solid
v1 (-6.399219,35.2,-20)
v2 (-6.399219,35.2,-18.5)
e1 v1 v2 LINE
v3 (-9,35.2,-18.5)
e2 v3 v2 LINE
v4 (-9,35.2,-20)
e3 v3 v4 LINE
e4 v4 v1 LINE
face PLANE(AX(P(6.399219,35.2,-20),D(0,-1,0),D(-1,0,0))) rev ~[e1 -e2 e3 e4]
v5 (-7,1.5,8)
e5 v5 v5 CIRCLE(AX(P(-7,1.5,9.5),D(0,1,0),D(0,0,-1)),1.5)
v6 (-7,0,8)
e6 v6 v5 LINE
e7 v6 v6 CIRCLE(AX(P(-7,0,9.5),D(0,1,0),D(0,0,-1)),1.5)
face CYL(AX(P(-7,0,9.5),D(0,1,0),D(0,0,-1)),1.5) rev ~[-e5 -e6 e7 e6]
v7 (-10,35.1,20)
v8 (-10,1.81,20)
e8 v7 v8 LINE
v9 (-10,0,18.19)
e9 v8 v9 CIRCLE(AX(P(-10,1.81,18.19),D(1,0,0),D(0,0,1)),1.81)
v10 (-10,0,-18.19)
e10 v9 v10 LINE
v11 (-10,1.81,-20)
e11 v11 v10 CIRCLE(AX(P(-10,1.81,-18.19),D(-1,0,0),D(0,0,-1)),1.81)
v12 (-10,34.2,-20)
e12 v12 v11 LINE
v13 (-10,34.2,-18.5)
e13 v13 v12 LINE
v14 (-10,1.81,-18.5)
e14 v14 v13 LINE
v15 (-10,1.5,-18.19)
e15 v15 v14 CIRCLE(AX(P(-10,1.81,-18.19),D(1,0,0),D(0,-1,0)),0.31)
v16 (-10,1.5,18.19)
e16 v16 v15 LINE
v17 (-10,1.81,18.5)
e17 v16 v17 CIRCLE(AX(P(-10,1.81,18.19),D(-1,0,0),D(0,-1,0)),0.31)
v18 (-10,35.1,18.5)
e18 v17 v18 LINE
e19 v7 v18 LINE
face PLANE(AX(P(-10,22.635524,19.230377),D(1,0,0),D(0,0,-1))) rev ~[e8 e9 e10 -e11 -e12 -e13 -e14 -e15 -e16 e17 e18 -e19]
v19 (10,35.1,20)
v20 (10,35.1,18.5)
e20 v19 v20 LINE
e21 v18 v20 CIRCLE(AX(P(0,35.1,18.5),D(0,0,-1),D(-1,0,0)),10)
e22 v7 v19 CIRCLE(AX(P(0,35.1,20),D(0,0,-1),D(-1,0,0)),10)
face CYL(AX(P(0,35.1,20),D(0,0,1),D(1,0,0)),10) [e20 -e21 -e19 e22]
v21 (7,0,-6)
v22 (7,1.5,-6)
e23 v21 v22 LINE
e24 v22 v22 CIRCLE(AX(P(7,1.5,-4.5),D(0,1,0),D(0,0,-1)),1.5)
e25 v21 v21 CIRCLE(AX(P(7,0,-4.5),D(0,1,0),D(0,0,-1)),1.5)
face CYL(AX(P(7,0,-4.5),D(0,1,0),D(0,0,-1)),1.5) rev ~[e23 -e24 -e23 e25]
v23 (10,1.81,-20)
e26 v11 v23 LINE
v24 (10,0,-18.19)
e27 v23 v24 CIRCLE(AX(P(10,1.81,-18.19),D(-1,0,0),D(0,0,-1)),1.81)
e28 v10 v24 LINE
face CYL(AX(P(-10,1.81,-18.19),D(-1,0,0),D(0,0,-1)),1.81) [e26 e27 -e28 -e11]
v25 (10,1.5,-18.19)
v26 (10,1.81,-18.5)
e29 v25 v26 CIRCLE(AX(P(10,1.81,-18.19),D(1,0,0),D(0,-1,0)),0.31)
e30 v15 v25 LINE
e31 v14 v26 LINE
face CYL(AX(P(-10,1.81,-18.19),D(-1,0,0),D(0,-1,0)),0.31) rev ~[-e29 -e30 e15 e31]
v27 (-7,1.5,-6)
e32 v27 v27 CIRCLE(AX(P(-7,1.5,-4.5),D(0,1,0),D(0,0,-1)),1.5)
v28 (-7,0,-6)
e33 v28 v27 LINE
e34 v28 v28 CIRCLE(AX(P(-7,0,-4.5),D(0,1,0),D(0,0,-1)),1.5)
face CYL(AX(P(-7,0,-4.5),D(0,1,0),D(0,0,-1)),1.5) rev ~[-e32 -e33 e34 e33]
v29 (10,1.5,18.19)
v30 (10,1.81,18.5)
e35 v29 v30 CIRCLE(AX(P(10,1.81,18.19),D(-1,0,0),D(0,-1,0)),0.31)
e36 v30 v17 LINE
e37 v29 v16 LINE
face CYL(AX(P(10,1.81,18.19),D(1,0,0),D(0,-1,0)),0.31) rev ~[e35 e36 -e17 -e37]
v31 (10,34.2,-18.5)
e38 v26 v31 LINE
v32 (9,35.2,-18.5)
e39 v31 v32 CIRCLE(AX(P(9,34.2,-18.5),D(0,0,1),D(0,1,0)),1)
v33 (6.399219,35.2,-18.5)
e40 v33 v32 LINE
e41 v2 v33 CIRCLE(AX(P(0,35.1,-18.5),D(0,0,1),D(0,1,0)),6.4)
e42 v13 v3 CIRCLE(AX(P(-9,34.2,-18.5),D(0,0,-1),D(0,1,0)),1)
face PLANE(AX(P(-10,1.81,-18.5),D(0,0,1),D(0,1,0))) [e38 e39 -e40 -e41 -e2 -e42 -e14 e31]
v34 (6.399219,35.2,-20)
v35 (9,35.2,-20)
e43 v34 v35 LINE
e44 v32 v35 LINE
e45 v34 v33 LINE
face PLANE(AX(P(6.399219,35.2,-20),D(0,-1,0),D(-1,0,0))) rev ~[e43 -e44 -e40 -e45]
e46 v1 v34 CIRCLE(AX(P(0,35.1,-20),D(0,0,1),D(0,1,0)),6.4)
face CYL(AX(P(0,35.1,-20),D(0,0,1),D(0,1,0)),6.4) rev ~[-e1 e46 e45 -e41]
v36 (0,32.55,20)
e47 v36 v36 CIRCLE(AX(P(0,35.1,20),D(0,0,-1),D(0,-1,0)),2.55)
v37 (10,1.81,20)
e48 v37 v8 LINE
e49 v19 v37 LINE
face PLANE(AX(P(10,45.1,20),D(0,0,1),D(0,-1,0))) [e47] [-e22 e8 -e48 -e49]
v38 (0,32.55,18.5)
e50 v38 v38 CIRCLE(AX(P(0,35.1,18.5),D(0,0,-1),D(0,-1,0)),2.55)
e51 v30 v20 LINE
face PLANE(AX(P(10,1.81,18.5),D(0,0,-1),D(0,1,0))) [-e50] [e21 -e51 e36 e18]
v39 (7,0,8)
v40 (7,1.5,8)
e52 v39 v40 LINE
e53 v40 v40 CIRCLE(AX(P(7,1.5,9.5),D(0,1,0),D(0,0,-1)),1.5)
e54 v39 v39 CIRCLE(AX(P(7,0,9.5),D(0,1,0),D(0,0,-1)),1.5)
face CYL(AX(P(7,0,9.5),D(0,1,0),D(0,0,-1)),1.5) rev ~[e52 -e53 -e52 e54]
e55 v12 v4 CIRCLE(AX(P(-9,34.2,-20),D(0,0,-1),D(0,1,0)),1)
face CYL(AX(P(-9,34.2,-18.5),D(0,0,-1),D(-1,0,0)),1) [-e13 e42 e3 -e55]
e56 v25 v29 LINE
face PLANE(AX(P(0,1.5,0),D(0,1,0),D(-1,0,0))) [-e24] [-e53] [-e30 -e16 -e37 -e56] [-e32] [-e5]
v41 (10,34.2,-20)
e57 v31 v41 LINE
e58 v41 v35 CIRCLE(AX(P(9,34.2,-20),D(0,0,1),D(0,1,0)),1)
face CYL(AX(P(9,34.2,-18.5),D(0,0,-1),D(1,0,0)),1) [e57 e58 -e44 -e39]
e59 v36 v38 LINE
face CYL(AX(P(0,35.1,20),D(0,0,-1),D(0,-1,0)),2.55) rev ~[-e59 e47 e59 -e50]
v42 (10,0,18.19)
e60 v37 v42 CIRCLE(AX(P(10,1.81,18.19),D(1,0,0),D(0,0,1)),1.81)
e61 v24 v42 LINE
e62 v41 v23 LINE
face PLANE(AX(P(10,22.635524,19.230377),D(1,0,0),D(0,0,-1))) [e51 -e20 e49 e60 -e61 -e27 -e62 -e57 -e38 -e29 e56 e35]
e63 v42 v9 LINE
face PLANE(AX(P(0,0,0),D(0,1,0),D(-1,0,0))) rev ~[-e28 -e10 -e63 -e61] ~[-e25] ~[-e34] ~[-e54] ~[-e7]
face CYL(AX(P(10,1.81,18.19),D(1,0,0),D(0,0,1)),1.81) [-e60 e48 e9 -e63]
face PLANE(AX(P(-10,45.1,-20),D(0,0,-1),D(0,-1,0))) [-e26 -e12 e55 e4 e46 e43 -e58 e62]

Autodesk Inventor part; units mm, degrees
ref_plane "YZ Plane" through (0, 0, 0) normal (1, 0, 0) x (0, 1, 0)
ref_plane "XZ Plane" through (0, 0, 0) normal (0, 1, 0) x (-1, 0, 0)
ref_plane "XY Plane" through (0, 0, 0) normal (0, 0, 1) x (1, 0, 0)
sketch "Sketch1" plane through (0, 0, 0) normal (0, 1, 0) x (-1, 0, 0)
  line L0 (10, -18.5) -> (-10, -18.5)
  line L1 (-10, -18.5) -> (-10, 18.5)
  line L2 (-10, 18.5) -> (10, 18.5)
  line L3 (10, 18.5) -> (10, -18.5)
  point P0 (0, 0)
  dimension "d0" = 20
  dimension "d1" = 37
  dimension "d2" = 18.5
  dimension "d3" = 10
extrude "Plate1" add sketch "Sketch1" along normal blind 1.5
sketch "Sketch2" plane through (-10, 0, -20) normal (0, 0, 1) x (1, 0, 0)
  line L0 (20, 0) -> (0, 0)
  line L1 (0, 0) -> (0, 45.1)
  line L2 (0, 45.1) -> (20, 45.1)
  line L3 (20, 45.1) -> (20, 0)
edge flange "Flange1" height 45.1 angle 90 thickness 1.5 bend radius 0.31 thickness toward (0, 0, 1) relief tear relief width 1.5 relief depth 0.75 edges at (0, 1.5, -18.5) wall of the first edge with corners at (10, 0, -20) (-10, 0, -20) (-10, 45.1, -20) (10, 45.1, -20)
bend "Bend1"
corner "Corner1"
sketch "Sketch3" plane through (10, 0, 20) normal (0, 0, -1) x (-1, 0, 0)
  line L0 (20, 0) -> (0, 0)
  line L1 (0, 0) -> (0, 45.1)
  line L2 (0, 45.1) -> (20, 45.1)
  line L3 (20, 45.1) -> (20, 0)
edge flange "Flange2" height 45.1 angle 90 thickness 1.5 bend radius 0.31 thickness toward (0, 0, -1) relief tear relief width 1.5 relief depth 0.75 edges at (0, 1.5, 18.5) wall of the first edge with corners at (-10, 0, 20) (10, 0, 20) (10, 45.1, 20) (-10, 45.1, 20)
bend "Bend2"
corner "Corner2"
sketch "Sketch4" plane through (-10, 45.1, 20) normal (0, 0, 1) x (1, 0, 0)
  circle A0 centre (10, -10) radius 10
  line L0 (0, 0) -> (20, 0) projected
  line L1 (0, 0) -> (20, 0)
  line L2 (20, 0) -> (20, -10)
  line L3 (20, -10) -> (0, -10)
  line L4 (0, -10) -> (0, 0)
  line L5 (0, -43.29) -> (0, 0) projected
  point P0 (10, -45.1)
  point P1 (10, -10)
  point P2 (20, 0)
  point P3 (10, 0)
  point P4 (0, -10)
  point P5 (8.5893, 0)
  point P6 (0, -10)
  dimension "d26" = 20
  dimension "d25" = 10
  dimension "d27" = 10
  dimension "d28" = 10
extrude "Extrusion1" cut sketch "Sketch4" against normal blind 10 contours L4 L0 A0 | A0 L0 L2
sketch "Sketch5" plane through (10, 45.1, -20) normal (0, 0, -1) x (-1, 0, 0)
  arc A0 (20, -10) -> (0, -10) centre (10, -10) ccw projected
  point P0 (10, -45.1)
hole "Hole1" at (0, 35.1, -20) direction (0, 0, 1) diameter 12.8 depth 1.5
sketch "Sketch6" plane through (10, 45.1, -20) normal (0, 0, -1) x (-1, 0, 0)
  circle A0 centre (10, -10) radius 6.4 projected
  line L0 (0, 0) -> (20, 0) projected
  line L1 (0, -43.29) -> (0, 0) projected
  line L2 (24, 0) -> (-4, 0)
  line L3 (-4, 0) -> (-4, -9.9)
  line L4 (-4, -9.9) -> (24, -9.9)
  line L5 (24, -9.9) -> (24, 0)
  point P0 (10, -45.1)
  point P1 (20, 0)
  point P2 (6.005, 0)
  point P3 (13.995, 0)
  dimension "d38" = 9.9
  dimension "d39" = 4
  dimension "d40" = 28
extrude "Extrusion2" cut sketch "Sketch6" against normal blind 10 contours L4 A0 | A0 L4 L1 L0 L2 L5 | L4 L3 L2 L1 picked at (9.1972, -6.4205)
fillet "Fillet1" radius 1 2 edges at (-10, 35.2, -19.25) (10, 35.2, -19.25)
sketch "Sketch7" plane through (-10, 1.81, 20) normal (0, 0, 1) x (1, 0, 0)
  arc A0 (20, 33.29) -> (0, 33.29) centre (10, 33.29) ccw projected
  point P0 (10, -1.81)
hole "Hole2" at (0, 35.1, 20) direction (0, 0, -1) diameter 5.1 depth 1.5 clearance for "Hex Head Bolt" size "M5" standard "Ansi Metric M Profile"
sketch "Sketch8" plane through (0, 0, 0) normal (0, -1, 0) x (1, 0, 0)
  line L0 (2.55, 18.5) -> (-2.55, 18.5) projected
  line L1 (-10, 18.5) -> (10, 18.5) projected
  line L2 (10, 18.5) -> (-10, 18.5) projected
  line L3 (10, 18.19) -> (-10, 18.19) projected
  line L4 (-10, -18.19) -> (-10, 18.19) projected
  line L5 (-10, -18.19) -> (10, -18.19) projected
  line L6 (10, 18.19) -> (10, -18.19) projected
  point P0 (0, 0)
  point P1 (7, 9.5)
  point P2 (7, -4.5)
  point P3 (-7, 9.5)
  point P4 (-7, -4.5)
  dimension "d51" = 9
  dimension "d52" = 3
  dimension "d55" = 14
  dimension "d58" = 14
hole "Hole3" at (7, 0, 9.5) at (7, 0, -4.5) at (-7, 0, 9.5) at (-7, 0, -4.5) direction (0, 1, 0) diameter 3 depth 1.5
equation "\"d36\" = Thickness"
equation "\"d49\" = Thickness"
equation "\"d66\" = Thickness"
equation "\"d4\" = Thickness"
equation "\"d5\" = BendReliefWidth"
equation "\"d6\" = BendReliefDepth"
equation "\"d7\" = MinimumRemnant"
equation "\"d8\" = TransitionRadius"
equation "\"d11\" = BendRadius"
equation "\"d12\" = CornerReliefSize"
equation "\"d13\" = GapSize"
equation "\"d14\" = JacobiRadiusSize"
equation "\"d15\" = BendReliefWidth"
equation "\"d16\" = BendReliefDepth"
equation "\"d17\" = MinimumRemnant"
equation "\"d18\" = TransitionRadius"
equation "\"d21\" = BendRadius"
equation "\"d22\" = CornerReliefSize"
equation "\"d23\" = GapSize"
equation "\"d24\" = JacobiRadiusSize"
equation "\"BendReliefWidth\" = Thickness"
equation "\"BendReliefDepth\" = 0.5 * Thickness"
equation "\"CornerReliefSize\" = 4 * Thickness"
equation "\"MinimumRemnant\" = 2 * Thickness"
equation "\"TransitionRadius\" = BendRadius"
equation "\"JacobiRadiusSize\" = BendRadius"
equation "\"GapSize\" = Thickness"
equation "\"Thickness\" = 1.5"
equation "\"BendRadius\" = 0.31"
properties part number "axis_9_bottom_frame" material "Aluminum 6061-AHC"
